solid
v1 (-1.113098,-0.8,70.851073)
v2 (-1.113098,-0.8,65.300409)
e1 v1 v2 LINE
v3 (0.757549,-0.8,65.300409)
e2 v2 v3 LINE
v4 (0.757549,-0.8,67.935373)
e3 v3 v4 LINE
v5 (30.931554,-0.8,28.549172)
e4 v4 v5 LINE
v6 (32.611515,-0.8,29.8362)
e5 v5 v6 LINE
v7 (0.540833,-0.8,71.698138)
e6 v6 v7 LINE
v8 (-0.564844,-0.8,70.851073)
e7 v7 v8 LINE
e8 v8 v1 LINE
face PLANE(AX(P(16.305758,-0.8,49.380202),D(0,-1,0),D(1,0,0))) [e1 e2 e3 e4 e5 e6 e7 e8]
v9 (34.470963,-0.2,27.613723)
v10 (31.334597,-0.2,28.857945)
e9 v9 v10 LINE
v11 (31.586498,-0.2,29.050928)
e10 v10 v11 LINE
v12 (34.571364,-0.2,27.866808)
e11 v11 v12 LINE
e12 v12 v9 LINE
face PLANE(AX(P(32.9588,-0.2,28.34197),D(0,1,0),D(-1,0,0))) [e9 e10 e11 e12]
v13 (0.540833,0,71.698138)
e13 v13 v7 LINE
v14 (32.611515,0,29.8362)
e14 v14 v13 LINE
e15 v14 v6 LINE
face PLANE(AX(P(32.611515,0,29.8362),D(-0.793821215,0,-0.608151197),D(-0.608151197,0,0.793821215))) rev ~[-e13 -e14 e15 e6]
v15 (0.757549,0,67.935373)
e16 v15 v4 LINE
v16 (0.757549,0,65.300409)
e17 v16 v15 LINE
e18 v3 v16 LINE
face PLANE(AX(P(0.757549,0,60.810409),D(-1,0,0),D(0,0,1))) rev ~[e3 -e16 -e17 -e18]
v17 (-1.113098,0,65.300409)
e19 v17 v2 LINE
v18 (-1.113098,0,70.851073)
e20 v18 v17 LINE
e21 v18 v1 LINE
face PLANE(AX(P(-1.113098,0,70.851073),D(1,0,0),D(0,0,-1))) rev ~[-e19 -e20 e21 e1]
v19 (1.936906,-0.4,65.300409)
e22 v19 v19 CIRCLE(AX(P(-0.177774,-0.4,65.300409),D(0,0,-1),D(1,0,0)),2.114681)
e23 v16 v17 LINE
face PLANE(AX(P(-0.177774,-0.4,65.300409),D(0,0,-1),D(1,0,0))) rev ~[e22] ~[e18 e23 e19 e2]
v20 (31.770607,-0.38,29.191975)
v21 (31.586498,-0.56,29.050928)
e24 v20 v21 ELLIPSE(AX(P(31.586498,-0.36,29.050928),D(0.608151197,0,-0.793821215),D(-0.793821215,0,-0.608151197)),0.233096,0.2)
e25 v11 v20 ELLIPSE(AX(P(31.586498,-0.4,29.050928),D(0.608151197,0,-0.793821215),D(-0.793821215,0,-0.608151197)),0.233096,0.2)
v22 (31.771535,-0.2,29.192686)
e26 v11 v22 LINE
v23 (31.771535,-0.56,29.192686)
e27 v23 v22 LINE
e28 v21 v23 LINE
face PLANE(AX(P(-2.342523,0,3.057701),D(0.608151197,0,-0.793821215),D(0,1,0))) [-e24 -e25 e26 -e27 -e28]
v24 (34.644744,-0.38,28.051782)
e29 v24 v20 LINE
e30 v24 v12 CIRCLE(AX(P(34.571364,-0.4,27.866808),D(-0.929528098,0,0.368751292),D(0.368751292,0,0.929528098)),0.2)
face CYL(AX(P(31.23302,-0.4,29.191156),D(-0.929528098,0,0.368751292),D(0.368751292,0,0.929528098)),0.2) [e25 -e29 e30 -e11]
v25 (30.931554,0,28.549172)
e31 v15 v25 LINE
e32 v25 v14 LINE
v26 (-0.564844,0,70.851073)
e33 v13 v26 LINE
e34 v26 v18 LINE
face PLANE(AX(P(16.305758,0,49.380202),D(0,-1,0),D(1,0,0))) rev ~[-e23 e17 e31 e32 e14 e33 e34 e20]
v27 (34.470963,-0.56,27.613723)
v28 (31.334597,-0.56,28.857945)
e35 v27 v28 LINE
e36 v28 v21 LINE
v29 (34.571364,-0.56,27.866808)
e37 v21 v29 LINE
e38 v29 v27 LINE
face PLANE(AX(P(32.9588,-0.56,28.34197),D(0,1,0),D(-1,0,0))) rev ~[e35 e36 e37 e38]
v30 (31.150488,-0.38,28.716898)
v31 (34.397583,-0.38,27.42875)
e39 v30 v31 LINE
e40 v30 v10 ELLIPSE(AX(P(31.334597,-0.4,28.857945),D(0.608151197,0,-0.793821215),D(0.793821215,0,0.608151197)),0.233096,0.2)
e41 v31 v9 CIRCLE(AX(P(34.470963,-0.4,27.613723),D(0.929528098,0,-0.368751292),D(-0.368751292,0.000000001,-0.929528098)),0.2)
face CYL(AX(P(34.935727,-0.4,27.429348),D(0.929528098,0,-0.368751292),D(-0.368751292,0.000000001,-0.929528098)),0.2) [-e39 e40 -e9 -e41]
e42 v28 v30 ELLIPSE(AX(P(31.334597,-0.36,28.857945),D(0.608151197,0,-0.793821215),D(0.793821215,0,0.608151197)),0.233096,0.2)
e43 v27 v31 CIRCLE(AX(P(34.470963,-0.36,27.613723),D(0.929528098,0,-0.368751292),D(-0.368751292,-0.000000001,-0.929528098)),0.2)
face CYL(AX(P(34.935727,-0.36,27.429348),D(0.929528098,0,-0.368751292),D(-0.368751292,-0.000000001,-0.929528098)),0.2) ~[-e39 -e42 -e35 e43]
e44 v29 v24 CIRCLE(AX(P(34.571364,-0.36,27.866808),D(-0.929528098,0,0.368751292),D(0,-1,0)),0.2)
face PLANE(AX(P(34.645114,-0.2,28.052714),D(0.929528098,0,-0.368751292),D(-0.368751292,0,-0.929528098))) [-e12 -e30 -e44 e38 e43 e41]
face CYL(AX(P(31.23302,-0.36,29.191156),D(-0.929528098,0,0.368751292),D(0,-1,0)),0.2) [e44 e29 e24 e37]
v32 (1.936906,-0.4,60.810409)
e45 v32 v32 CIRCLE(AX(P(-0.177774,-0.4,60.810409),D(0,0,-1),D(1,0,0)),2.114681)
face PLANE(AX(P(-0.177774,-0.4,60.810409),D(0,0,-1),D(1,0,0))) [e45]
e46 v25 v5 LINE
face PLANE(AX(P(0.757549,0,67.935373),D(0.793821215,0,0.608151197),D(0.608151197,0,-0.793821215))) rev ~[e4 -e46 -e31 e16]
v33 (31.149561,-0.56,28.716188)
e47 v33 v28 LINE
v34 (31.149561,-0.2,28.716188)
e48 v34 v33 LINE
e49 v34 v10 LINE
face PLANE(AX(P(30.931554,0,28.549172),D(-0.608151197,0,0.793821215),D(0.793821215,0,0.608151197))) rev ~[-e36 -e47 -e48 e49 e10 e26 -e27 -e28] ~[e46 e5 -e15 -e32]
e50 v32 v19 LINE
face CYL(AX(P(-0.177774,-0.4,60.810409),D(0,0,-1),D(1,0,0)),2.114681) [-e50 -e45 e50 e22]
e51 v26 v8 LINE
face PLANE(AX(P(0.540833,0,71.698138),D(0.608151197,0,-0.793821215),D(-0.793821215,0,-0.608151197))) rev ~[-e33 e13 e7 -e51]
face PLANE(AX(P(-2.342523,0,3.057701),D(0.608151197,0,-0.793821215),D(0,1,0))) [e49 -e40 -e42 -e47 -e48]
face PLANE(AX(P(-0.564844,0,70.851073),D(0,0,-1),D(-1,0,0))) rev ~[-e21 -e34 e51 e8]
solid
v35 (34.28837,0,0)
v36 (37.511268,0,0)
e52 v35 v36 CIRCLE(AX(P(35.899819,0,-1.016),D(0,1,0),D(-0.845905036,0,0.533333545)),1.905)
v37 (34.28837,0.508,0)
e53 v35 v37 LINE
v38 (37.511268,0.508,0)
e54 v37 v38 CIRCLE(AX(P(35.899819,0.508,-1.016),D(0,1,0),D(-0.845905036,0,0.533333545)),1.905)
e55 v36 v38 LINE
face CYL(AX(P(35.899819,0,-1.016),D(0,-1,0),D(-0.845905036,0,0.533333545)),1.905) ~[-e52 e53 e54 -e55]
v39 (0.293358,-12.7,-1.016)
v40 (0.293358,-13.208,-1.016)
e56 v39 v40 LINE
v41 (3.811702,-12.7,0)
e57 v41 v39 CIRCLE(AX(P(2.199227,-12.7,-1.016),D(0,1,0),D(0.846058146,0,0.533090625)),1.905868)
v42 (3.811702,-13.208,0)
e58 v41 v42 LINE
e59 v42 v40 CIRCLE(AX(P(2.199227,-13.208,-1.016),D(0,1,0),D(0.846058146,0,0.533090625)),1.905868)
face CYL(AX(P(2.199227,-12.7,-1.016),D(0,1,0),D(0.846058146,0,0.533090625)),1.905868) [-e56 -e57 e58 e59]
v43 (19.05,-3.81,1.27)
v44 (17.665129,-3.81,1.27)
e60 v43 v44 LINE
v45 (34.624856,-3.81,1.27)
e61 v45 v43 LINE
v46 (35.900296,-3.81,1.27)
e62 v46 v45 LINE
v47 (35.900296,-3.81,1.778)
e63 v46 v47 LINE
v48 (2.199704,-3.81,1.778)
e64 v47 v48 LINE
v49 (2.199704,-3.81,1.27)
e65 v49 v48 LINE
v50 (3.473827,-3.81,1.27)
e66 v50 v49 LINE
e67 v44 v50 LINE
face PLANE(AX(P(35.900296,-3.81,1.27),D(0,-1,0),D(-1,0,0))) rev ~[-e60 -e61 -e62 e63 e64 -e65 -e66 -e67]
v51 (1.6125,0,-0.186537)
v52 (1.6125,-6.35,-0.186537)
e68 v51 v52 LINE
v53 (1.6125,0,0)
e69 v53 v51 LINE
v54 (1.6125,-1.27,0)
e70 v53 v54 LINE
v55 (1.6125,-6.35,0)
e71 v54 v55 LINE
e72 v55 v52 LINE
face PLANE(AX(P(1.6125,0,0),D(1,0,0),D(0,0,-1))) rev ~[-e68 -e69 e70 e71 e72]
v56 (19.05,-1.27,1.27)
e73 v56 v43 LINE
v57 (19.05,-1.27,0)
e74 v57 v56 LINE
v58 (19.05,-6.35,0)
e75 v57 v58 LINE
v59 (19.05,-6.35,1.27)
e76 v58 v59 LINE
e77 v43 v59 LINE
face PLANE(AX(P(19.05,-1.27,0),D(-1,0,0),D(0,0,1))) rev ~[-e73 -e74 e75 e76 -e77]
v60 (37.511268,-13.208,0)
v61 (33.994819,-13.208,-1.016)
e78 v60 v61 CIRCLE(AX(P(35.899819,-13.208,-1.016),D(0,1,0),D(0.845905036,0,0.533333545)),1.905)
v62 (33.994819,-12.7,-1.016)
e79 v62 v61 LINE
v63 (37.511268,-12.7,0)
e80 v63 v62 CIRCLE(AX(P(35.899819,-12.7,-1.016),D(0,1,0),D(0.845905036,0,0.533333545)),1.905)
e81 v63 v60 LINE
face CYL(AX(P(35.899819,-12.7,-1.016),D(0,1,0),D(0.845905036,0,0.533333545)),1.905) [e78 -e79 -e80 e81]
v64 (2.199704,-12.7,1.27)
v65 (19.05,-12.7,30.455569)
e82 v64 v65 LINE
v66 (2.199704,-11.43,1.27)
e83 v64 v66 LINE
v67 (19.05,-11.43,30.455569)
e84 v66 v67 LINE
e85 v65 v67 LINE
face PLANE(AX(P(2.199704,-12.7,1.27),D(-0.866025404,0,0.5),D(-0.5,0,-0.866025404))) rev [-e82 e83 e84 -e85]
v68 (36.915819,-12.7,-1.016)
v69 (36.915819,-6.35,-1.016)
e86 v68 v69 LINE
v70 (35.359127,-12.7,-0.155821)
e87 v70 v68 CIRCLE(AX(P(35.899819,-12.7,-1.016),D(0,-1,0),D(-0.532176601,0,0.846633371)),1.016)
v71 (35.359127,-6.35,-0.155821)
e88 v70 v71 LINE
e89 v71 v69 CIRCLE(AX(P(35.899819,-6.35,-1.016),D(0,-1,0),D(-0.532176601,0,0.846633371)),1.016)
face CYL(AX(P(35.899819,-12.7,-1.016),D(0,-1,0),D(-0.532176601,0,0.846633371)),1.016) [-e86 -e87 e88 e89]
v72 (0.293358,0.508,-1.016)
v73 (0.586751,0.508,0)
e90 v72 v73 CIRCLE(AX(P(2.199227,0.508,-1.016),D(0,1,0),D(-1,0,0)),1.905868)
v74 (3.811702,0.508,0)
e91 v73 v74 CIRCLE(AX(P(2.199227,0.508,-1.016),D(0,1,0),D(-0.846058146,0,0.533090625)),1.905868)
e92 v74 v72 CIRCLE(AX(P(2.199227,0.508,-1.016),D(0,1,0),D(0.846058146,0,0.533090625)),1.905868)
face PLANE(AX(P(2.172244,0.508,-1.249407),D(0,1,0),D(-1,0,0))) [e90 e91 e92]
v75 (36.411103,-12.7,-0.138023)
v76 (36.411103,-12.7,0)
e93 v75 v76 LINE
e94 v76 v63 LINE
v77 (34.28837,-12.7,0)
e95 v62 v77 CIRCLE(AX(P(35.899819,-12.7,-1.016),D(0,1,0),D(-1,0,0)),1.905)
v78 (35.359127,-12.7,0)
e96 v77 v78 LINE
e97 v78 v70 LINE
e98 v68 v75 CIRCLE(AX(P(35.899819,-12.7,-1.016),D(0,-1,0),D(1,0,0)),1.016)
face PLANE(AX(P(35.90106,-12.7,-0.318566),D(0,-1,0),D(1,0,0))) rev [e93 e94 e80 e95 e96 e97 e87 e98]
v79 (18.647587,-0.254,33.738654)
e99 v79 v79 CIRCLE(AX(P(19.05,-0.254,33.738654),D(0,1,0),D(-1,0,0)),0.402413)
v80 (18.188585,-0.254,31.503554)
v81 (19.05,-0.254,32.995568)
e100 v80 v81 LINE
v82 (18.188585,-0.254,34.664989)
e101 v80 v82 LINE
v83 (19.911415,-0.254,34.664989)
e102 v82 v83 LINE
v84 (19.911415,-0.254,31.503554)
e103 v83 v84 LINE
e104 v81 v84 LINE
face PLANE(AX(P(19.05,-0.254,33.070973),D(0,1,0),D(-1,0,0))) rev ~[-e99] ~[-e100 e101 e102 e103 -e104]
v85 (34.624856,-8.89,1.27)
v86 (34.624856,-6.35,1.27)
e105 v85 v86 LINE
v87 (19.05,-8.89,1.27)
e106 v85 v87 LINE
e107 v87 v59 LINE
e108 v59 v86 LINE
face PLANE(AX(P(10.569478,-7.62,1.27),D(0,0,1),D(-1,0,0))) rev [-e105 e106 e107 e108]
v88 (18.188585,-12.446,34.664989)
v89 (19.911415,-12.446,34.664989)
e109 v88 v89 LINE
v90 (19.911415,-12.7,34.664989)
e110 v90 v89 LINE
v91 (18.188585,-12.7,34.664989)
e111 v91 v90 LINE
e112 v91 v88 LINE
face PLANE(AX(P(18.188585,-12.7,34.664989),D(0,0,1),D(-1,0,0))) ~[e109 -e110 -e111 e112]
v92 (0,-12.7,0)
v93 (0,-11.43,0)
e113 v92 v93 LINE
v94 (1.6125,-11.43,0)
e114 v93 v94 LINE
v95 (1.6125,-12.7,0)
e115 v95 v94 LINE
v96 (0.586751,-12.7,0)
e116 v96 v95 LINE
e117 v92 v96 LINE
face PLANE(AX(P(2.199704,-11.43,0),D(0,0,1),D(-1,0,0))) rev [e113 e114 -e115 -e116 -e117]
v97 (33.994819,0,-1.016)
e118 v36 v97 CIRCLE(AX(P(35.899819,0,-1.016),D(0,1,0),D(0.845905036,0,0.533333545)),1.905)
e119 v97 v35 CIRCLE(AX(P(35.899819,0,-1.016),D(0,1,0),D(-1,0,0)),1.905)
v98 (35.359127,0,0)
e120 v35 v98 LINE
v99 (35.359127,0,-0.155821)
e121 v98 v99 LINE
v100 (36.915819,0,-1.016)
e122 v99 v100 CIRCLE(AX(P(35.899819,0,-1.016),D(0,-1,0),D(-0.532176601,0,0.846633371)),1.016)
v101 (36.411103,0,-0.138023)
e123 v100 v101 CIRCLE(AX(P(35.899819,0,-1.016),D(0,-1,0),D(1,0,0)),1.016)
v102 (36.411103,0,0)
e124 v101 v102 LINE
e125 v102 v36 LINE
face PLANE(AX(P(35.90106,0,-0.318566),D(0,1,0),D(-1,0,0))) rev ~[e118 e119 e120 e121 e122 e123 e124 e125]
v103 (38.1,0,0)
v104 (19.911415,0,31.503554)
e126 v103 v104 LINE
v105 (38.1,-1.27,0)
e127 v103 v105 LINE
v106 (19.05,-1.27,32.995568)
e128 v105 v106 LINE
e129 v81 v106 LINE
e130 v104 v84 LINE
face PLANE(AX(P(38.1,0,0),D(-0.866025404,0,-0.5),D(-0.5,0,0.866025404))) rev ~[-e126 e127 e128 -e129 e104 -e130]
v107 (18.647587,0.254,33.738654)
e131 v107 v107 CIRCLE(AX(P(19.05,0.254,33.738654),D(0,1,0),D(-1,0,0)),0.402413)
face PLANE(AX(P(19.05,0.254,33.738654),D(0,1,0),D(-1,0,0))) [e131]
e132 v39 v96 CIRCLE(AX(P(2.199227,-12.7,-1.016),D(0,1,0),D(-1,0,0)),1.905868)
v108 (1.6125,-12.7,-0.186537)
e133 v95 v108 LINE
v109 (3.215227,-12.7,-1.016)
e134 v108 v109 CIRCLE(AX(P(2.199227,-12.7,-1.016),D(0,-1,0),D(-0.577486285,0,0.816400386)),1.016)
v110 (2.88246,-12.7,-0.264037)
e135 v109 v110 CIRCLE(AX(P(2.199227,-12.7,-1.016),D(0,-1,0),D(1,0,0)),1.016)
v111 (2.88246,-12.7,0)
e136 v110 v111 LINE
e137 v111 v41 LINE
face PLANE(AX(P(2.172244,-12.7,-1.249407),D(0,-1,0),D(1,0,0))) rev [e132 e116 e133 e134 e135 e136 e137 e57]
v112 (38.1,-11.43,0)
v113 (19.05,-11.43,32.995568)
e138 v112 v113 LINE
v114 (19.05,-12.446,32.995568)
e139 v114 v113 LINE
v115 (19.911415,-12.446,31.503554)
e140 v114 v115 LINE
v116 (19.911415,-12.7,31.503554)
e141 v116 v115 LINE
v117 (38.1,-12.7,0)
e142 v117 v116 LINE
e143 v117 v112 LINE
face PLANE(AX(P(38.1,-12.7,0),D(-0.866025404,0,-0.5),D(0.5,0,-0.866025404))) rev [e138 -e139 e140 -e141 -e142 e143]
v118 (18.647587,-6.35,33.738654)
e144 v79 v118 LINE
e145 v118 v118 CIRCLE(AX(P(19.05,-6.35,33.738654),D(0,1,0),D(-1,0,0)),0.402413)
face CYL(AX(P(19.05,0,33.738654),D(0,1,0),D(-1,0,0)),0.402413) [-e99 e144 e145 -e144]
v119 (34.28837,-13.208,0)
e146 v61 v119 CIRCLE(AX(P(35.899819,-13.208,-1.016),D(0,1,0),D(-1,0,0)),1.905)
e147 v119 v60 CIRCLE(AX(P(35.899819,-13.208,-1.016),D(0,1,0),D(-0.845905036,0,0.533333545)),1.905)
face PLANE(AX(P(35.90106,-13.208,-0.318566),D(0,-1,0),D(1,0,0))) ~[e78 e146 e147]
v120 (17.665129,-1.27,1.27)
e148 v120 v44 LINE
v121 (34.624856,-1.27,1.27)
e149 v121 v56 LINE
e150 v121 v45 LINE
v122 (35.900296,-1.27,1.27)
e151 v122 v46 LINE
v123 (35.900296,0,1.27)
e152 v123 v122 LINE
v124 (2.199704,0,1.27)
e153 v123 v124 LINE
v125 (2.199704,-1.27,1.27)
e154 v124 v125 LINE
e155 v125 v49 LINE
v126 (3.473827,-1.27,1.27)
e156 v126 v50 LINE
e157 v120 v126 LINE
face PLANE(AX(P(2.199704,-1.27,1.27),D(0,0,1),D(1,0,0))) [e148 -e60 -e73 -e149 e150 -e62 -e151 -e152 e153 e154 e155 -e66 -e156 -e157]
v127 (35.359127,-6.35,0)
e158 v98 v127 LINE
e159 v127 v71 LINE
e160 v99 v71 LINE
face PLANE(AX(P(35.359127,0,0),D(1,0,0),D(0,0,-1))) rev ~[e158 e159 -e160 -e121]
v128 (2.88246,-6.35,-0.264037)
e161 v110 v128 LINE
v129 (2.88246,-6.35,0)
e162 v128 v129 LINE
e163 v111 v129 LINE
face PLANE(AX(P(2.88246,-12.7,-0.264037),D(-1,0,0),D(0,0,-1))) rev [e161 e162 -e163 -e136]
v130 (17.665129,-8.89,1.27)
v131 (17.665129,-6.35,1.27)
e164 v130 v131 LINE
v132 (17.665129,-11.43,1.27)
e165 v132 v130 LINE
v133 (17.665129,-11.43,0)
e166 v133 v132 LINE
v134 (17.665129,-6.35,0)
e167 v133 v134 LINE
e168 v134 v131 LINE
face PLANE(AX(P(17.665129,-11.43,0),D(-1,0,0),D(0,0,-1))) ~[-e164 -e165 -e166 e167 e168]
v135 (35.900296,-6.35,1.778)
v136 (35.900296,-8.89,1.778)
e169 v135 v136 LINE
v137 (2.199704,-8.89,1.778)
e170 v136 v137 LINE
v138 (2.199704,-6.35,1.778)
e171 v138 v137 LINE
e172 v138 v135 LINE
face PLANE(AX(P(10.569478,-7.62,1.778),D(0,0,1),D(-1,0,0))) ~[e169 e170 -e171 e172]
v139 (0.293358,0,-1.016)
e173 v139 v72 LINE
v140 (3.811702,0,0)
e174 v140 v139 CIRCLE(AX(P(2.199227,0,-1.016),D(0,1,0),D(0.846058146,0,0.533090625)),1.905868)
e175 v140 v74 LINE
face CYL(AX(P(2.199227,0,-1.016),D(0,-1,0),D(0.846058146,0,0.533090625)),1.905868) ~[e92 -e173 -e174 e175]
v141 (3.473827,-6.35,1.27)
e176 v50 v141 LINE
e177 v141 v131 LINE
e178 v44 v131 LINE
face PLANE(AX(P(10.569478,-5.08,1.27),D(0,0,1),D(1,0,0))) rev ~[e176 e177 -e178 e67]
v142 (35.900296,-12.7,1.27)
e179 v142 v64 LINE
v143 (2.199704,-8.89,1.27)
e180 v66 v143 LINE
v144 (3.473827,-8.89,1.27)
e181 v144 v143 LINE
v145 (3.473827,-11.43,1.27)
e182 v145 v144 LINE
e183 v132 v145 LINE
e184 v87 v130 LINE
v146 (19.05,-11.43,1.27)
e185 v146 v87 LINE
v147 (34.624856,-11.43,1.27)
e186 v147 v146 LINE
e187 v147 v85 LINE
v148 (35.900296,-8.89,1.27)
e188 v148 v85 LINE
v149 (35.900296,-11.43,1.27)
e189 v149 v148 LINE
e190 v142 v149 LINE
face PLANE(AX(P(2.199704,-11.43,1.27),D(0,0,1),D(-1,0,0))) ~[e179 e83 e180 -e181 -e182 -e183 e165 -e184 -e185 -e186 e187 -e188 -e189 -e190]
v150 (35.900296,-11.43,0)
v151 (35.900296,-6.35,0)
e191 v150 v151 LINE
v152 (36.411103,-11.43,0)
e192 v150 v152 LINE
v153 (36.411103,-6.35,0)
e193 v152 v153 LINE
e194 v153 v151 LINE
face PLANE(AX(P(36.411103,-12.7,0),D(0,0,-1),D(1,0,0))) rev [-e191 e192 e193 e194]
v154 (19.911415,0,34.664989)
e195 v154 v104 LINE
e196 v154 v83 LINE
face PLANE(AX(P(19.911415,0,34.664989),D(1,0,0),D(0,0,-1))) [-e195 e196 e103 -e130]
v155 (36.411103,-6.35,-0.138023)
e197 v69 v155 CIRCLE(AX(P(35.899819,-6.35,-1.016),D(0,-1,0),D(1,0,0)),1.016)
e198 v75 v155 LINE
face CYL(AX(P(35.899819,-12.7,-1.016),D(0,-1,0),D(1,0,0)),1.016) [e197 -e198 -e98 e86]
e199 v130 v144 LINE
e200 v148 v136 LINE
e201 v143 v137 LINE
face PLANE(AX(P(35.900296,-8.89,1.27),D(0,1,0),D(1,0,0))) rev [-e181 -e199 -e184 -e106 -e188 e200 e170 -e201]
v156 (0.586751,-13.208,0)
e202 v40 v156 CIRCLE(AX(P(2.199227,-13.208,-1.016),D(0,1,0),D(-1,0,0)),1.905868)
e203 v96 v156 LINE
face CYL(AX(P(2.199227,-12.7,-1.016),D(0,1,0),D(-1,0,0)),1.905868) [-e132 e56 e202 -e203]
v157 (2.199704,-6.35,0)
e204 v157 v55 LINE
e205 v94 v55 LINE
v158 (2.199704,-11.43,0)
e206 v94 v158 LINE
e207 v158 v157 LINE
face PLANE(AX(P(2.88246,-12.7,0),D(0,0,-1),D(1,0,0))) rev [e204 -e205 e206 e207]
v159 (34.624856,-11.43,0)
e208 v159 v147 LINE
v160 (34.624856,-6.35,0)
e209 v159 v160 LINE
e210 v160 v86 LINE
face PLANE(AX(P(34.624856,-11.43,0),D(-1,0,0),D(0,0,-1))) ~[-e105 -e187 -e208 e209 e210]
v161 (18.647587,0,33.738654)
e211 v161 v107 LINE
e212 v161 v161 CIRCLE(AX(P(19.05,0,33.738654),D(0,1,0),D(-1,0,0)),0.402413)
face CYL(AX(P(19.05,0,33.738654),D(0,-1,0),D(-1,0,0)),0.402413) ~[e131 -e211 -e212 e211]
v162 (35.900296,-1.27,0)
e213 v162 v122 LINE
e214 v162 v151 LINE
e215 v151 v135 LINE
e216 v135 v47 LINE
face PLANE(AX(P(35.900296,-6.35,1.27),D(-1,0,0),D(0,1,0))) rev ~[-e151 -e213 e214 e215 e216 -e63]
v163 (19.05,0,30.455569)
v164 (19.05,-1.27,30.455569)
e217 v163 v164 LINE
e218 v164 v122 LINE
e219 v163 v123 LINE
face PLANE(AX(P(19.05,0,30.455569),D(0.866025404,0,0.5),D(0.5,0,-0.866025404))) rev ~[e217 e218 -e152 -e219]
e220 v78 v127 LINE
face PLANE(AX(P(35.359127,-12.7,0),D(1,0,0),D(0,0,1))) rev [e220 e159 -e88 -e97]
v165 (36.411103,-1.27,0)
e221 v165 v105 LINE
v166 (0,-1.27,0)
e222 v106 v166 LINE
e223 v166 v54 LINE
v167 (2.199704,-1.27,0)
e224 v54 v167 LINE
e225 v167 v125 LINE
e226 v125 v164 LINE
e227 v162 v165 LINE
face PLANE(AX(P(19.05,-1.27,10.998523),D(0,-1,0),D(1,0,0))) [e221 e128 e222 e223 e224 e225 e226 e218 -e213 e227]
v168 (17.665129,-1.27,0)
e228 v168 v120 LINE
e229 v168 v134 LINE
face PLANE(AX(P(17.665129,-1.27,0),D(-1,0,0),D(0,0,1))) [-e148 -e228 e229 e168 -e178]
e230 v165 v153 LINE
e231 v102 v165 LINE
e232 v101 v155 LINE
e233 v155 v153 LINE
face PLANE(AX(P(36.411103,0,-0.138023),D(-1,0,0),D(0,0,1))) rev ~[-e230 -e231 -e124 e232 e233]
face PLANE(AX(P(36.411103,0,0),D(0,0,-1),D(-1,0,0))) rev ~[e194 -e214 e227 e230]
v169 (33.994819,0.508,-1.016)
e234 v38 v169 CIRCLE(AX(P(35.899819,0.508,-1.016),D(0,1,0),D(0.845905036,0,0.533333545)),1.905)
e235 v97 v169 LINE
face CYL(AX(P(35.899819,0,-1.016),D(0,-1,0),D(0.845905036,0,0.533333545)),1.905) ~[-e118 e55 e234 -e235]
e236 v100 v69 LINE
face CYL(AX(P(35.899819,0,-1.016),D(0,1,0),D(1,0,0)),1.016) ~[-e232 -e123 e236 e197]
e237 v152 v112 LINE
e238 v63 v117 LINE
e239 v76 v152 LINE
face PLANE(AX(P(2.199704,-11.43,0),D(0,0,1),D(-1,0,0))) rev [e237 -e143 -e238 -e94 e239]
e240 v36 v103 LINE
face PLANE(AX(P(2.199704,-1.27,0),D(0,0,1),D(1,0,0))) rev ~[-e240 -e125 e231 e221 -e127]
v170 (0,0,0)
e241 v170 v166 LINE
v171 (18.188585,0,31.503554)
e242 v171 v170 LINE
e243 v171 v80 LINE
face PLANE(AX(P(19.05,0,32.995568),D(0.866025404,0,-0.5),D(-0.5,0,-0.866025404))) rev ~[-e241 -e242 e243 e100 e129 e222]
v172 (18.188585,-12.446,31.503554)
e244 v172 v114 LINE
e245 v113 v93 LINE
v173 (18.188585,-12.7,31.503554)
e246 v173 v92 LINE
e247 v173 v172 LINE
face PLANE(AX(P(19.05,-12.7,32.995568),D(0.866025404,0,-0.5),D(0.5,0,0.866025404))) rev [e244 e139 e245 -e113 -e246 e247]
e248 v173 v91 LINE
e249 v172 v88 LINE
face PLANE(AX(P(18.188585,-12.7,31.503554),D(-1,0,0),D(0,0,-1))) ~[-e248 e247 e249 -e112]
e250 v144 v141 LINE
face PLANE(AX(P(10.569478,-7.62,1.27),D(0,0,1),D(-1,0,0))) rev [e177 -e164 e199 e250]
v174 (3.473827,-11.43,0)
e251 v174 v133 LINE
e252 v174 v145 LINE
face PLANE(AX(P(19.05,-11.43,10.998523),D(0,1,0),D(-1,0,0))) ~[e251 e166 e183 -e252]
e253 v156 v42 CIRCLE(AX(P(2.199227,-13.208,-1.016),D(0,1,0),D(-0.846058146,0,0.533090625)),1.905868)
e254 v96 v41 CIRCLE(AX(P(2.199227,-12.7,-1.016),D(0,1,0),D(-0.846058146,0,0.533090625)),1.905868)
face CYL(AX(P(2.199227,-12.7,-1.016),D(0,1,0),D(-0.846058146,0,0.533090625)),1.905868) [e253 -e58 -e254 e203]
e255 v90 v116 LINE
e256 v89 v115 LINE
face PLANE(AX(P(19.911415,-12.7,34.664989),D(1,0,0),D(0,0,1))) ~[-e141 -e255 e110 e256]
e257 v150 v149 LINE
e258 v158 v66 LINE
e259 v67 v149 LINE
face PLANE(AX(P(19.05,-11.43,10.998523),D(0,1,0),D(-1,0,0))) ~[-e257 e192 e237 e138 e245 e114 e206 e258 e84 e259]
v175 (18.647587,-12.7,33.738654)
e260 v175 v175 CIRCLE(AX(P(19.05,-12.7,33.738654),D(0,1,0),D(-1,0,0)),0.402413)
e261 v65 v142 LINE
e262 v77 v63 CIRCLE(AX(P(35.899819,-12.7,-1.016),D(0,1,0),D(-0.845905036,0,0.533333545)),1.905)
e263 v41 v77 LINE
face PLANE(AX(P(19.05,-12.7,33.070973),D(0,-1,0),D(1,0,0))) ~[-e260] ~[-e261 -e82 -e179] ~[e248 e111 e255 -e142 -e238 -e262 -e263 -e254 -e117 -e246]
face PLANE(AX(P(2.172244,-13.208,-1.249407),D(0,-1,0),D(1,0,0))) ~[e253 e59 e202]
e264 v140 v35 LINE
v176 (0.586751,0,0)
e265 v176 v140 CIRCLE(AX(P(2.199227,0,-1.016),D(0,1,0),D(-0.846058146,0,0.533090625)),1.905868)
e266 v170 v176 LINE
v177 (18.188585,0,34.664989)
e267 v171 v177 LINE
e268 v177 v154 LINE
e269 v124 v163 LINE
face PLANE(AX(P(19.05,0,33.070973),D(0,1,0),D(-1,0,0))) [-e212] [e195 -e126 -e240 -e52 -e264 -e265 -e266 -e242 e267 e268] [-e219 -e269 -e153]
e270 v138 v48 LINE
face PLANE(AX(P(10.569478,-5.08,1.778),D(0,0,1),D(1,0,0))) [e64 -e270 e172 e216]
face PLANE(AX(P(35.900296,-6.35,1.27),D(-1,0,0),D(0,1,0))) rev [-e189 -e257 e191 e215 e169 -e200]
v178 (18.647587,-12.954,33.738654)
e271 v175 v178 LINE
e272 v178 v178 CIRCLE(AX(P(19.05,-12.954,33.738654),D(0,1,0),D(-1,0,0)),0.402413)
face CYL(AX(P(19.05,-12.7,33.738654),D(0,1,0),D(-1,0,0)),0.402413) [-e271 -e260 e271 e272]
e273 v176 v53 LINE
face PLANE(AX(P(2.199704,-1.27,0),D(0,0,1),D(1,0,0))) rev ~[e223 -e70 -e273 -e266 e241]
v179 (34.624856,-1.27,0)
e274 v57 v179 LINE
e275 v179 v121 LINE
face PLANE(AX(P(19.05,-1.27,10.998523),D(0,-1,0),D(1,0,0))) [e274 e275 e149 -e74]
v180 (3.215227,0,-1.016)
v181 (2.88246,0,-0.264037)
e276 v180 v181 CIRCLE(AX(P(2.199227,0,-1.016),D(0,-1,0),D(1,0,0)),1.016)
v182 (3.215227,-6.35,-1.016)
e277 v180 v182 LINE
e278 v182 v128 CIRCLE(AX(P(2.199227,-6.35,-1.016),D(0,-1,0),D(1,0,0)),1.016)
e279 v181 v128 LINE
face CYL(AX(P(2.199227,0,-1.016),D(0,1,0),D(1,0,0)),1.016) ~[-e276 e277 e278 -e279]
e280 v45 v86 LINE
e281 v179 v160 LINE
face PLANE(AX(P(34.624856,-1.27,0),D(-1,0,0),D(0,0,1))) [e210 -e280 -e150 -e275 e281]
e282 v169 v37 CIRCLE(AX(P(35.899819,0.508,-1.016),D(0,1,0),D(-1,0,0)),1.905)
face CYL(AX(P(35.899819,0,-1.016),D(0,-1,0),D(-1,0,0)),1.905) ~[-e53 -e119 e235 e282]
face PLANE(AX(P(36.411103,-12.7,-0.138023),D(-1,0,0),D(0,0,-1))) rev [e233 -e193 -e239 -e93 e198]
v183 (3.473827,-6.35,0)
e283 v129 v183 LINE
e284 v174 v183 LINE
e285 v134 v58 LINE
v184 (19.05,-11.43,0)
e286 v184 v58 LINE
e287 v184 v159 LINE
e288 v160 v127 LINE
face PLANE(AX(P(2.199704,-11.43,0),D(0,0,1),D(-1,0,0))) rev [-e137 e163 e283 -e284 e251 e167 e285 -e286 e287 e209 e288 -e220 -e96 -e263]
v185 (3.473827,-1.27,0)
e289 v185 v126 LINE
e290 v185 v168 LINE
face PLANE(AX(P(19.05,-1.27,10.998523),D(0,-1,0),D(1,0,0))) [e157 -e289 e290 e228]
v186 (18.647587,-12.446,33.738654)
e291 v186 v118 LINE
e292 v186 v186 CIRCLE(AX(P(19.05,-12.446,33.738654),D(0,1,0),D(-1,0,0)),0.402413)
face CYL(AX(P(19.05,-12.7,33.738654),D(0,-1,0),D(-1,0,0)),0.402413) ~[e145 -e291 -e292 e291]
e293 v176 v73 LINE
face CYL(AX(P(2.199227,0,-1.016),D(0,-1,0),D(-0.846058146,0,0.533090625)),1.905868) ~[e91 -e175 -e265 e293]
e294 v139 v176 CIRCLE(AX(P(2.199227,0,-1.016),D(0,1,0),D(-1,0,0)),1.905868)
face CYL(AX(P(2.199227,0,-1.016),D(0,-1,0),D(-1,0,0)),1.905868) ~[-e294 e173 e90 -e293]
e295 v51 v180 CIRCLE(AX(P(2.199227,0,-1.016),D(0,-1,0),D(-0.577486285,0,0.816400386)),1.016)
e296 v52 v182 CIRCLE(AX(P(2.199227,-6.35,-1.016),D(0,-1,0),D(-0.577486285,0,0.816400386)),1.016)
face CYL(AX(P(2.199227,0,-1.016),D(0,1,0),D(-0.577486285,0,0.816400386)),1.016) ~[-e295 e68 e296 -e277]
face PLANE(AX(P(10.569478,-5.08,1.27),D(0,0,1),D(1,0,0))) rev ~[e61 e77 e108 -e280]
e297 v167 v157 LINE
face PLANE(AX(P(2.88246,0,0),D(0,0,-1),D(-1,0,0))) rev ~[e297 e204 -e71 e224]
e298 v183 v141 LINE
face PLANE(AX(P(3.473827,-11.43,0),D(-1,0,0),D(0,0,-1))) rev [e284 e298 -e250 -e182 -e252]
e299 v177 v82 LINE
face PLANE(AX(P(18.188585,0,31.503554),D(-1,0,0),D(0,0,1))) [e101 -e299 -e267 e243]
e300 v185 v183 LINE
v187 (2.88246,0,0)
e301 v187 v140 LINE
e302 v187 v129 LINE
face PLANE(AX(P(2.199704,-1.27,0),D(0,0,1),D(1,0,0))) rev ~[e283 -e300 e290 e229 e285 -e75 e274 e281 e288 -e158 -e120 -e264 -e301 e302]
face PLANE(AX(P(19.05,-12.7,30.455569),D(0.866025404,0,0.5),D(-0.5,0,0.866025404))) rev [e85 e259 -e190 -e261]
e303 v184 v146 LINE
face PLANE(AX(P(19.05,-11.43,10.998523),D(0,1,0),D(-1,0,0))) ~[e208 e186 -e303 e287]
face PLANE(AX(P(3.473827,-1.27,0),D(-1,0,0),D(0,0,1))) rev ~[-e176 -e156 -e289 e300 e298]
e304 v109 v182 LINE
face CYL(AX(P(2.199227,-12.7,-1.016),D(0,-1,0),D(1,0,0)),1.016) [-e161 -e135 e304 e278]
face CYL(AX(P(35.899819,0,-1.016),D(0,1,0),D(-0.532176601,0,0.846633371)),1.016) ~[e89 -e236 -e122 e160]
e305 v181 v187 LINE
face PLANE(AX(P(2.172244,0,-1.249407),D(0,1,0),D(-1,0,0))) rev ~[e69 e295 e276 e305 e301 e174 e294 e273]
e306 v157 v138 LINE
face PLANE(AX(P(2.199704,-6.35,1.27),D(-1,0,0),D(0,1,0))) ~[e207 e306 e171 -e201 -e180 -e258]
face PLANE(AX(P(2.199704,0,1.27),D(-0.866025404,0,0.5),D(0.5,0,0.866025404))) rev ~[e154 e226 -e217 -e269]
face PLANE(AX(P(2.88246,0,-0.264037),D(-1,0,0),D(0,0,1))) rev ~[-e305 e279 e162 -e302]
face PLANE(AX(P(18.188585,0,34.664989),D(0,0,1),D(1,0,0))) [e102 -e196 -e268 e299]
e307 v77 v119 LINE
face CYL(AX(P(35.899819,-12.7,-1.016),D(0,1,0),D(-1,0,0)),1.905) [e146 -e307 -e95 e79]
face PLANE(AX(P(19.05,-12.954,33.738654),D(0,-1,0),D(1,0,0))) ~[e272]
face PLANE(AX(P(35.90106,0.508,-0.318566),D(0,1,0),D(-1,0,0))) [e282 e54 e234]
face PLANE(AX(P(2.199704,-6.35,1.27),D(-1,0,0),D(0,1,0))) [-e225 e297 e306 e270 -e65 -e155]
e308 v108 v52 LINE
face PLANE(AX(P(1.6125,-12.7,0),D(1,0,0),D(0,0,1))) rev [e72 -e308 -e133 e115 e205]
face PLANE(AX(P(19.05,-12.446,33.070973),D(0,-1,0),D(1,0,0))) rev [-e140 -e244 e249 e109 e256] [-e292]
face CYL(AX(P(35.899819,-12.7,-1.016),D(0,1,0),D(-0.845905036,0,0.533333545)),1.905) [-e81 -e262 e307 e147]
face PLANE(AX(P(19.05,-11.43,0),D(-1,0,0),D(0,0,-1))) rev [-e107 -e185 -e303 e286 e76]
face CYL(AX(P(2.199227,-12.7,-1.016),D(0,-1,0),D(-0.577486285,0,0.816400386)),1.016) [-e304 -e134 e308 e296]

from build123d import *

# Parameters (mm, degrees)
F1_DEPTH       = 1.27
F2_W           = 1.2741235553
F2_H           = 1.2699995968
F2_W_2         = 1.3848708451
F2_W_3         = 1.2754402073
F3_DEPTH       = 5.08
F4_DEPTH       = 6.35
F6_DEPTH       = 0.508
F7_W           = 14.1913017724
F7_H           = 2.54
F7_W_2         = 1.2741235553
F7_W_3         = 1.3848708451
F7_W_4         = 15.5748559654
F7_W_5         = 1.2754402073
F8_DEPTH       = 0.508
F9_R           = 0.4024133142
F10_DEPTH      = 0.254
F11_DEPTH      = 0.254
F11_DEPTH_BACK = 6.35
F13_W          = 1.8706470204
F13_H          = 7.1249634751
F14_DEPTH      = 0.8
F15_R          = 2.114680679
F16_DEPTH      = 4.49
F18_START      = -0.2
F18_DEPTH      = 0.36
F19_T4_DEPTH   = 4.0914390002
F19_T9_DEPTH   = 4.0914390002
F19_T14_DEPTH  = 4.4938721404
F19_T19_DEPTH  = 4.4938721404


# Not quite as in the source:
# - a fillet or chamfer that OpenCascade refuses, or shapes differently, is made with other operations: its cross-section is extruded or revolved along the edge and cut away or added


with BuildPart() as f1:
    # F0 (on Front) → F1 (new body)
    with BuildSketch(Plane.XZ):
        Polygon((19.05, 32.9955678842), (0, 0), (1.6125002281, 0), (2.1992265269, 0), (2.8824598566, 0), (35.3591272308, 0), (35.8998188724, 0), (36.4111034397, 0), (38.1, 0), align=None)
        Polygon((35.9002961727, 1.2699995968), (2.1997038273, 1.2699995968), (19.05, 30.4555686905), align=None, mode=Mode.SUBTRACT)
    extrude(amount=F1_DEPTH)

    # F2 (on face) → F3 (join)
    with BuildSketch(Plane.XZ.offset(1.27)):
        with Locations((2.8367656049, 0.6349997984)):
            Rectangle(F2_W, F2_H)
        with Locations((18.3575645775, 0.6349997984)):
            Rectangle(F2_W_2, F2_H)
        with Locations((35.262576069, 0.6349997984)):
            Rectangle(F2_W_3, F2_H)
    extrude(amount=F3_DEPTH)

    # F0 (on Front) → F4 (join)
    with BuildSketch(Plane.XZ):
        with BuildLine():
            ThreePointArc((2.8824598566, -0.264036949), (2.5654652787, -0.0683053067), (2.1992265269, 0))
            ThreePointArc((2.1992265269, 0), (1.8913938178, -0.0477567136), (1.6125002281, -0.186537282))
            ThreePointArc((1.6125002281, -0.186537282), (1.7322454443, -1.9183226781), (3.2152269301, -1.0160004032))
            ThreePointArc((3.2152269301, -1.0160004032), (3.1283180611, -0.6048486789), (2.8824598566, -0.264036949))
        make_face()
        with BuildLine():
            ThreePointArc((36.4111034397, -0.138022664), (36.1646122657, -0.0351123983), (35.8998188724, 0))
            ThreePointArc((35.8998188724, 0), (35.6184705575, -0.0397320257), (35.3591272308, -0.1558205569))
            ThreePointArc((35.3591272308, -0.1558205569), (35.4084361837, -1.9052696945), (36.9158192755, -1.0160004032))
            ThreePointArc((36.9158192755, -1.0160004032), (36.7806486362, -0.5096450474), (36.4111034397, -0.138022664))
        make_face()
        with BuildLine():
            Line((2.1992265269, 0), (1.6125002281, 0))
            Line((1.6125002281, 0), (1.6125002281, -0.186537282))
            ThreePointArc((1.6125002281, -0.186537282), (1.8913938178, -0.0477567136), (2.1992265269, 0))
        make_face()
        with BuildLine():
            Line((36.4111034397, -0.138022664), (36.4111034397, 0))
            Line((36.4111034397, 0), (35.8998188724, 0))
            ThreePointArc((35.8998188724, 0), (36.1646122657, -0.0351123983), (36.4111034397, -0.138022664))
        make_face()
        with BuildLine():
            Line((35.8998188724, 0), (35.3591272308, 0))
            Line((35.3591272308, 0), (35.3591272308, -0.1558205569))
            ThreePointArc((35.3591272308, -0.1558205569), (35.6184705575, -0.0397320257), (35.8998188724, 0))
        make_face()
        with BuildLine():
            Line((2.8824598566, 0), (2.1992265269, 0))
            ThreePointArc((2.1992265269, 0), (2.5654652787, -0.0683053067), (2.8824598566, -0.264036949))
            Line((2.8824598566, -0.264036949), (2.8824598566, 0))
        make_face()
    extrude(amount=F4_DEPTH)

    # F5 (on face) → F6 (join)
    with BuildSketch(Plane(origin=(0, 0, 0), x_dir=(-1, 0, 0), z_dir=(0, 1, 0))):
        with BuildLine():
            Line((-35.3591272308, 0), (-34.2883697789, 0))
            ThreePointArc((-34.2883697789, 0), (-35.8998188724, 0.8889995968), (-37.5112679658, 0))
            Line((-37.5112679658, 0), (-36.4111034397, 0))
            Line((-36.4111034397, 0), (-36.4111034397, -0.138022664))
            ThreePointArc((-36.4111034397, -0.138022664), (-35.9170056479, -2.0318554293), (-35.3591272308, -0.1558205569))
            Line((-35.3591272308, -0.1558205569), (-35.3591272308, 0))
        make_face()
        with BuildLine():
            ThreePointArc((-37.5112679658, 0), (-36.4285978796, -2.8461418626), (-33.9948188724, -1.0160004032))
            ThreePointArc((-33.9948188724, -1.0160004032), (-34.0696774129, -0.4872213959), (-34.2883697789, 0))
            Line((-34.2883697789, 0), (-35.3591272308, 0))
            Line((-35.3591272308, 0), (-35.3591272308, -0.1558205569))
            ThreePointArc((-35.3591272308, -0.1558205569), (-35.9170056479, -2.0318554293), (-36.4111034397, -0.138022664))
            Line((-36.4111034397, -0.138022664), (-36.4111034397, 0))
            Line((-36.4111034397, 0), (-37.5112679658, 0))
        make_face()
        with BuildLine():
            Line((-2.8824598566, 0), (-3.8117017372, 0))
            ThreePointArc((-3.8117017372, 0), (-2.7279836056, -2.8470517609), (-0.293358451, -1.0160004032))
            ThreePointArc((-0.293358451, -1.0160004032), (-0.3681751692, -0.4872433245), (-0.5867513167, 0))
            Line((-0.5867513167, 0), (-1.6125002281, 0))
            Line((-1.6125002281, 0), (-1.6125002281, -0.186537282))
            ThreePointArc((-1.6125002281, -0.186537282), (-2.1373399263, -2.030114237), (-2.8824598566, -0.264036949))
            Line((-2.8824598566, -0.264036949), (-2.8824598566, 0))
        make_face()
        with BuildLine():
            ThreePointArc((-0.5867513167, 0), (-2.1992265269, 0.8898676727), (-3.8117017372, 0))
            Line((-3.8117017372, 0), (-2.8824598566, 0))
            Line((-2.8824598566, 0), (-2.8824598566, -0.264036949))
            ThreePointArc((-2.8824598566, -0.264036949), (-2.1373399263, -2.030114237), (-1.6125002281, -0.186537282))
            Line((-1.6125002281, -0.186537282), (-1.6125002281, 0))
            Line((-1.6125002281, 0), (-0.5867513167, 0))
        make_face()
    extrude(amount=F6_DEPTH)

    # F7 (on face) → F8 (join)
    with BuildSketch(Plane.XY.offset(1.2699995968)):
        with Locations((10.5694782687, -5.08)):
            Rectangle(F7_W, F7_H)
        with Locations((2.8367656049, -5.08)):
            Rectangle(F7_W_2, F7_H)
        with Locations((18.3575645775, -5.08)):
            Rectangle(F7_W_3, F7_H)
        with Locations((26.8374279827, -5.08)):
            Rectangle(F7_W_4, F7_H)
        with Locations((35.262576069, -5.08)):
            Rectangle(F7_W_5, F7_H)
    extrude(amount=F8_DEPTH)

    # F9 (on face) → F10 (join)
    with BuildSketch(Plane(origin=(0, 0, 0), x_dir=(-1, 0, 0), z_dir=(0, 1, 0))):
        Polygon((-19.9114145483, 34.6649885178), (-19.9114145483, 31.5035541202), (-19.05, 32.9955678842), (-18.1885854517, 31.5035541202), (-18.1885854517, 34.6649885178), align=None)
        with Locations((-19.05, 33.7386541069)):
            Circle(F9_R, mode=Mode.SUBTRACT)
        Polygon((-19.05, 32.9955678842), (-19.9114145483, 31.5035541202), (-18.1885854517, 31.5035541202), align=None)
    extrude(amount=-F10_DEPTH)

    # F9 (on face) → F11 (join, two sides)
    with BuildSketch(Plane(origin=(0, 0, 0), x_dir=(-1, 0, 0), z_dir=(0, 1, 0))) as f11_sk:
        with Locations((-19.05, 33.7386541069)):
            Circle(F9_R)
    extrude(amount=F11_DEPTH)
    extrude(f11_sk.sketch, amount=-F11_DEPTH_BACK)

    # F12: F1 across face


with BuildPart() as f1_1:
    add(f1.part)
    add(f1.part.mirror(Plane(origin=(18.9844198468, -6.35, 0.7885271629), x_dir=(1, 0, 0), z_dir=(0, -1, 0))))


with BuildPart() as f14:
    # F13 (on Front) → F14 (new body)
    with BuildSketch(Plane.XZ):
        Polygon((32.6115151858, 29.8361999529), (1.6799610114, 70.211231729), (0, 68.9242035151), (0.7575490221, 67.9353729614), (30.9315541743, 28.5491717389), align=None)
        Polygon((0, 68.9242035151), (1.6799610114, 70.211231729), (0.5408330401, 71.6981381993), (-0.5648436262, 70.851072669), (-1.1130979983, 70.4310517039), (-1.1130979983, 70.3771329992), align=None)
        Polygon((0.7575490221, 67.9353729614), (0, 68.9242035151), (-1.1130979983, 70.3771329992), (-1.1130979983, 67.9353729614), align=None)
        with Locations((-0.1777744881, 64.3728912239)):
            Rectangle(F13_W, F13_H)
        Polygon((-1.1130979983, 70.4310517039), (-0.5648436262, 70.851072669), (-1.1130979983, 70.851072669), align=None)
    extrude(amount=F14_DEPTH)

    # F15 (on face) → F16 (join)
    with BuildSketch(Plane(origin=(0, 0, 60.8104094863), x_dir=(1, 0, 0), z_dir=(0, 0, -1))):
        with Locations((-0.1777744881, 0.4)):
            Circle(F15_R)
        Polygon((0.7575490221, 0), (-0.1777744881, 0), (-1.1130979983, 0), (-1.1130979983, 0.8), (-0.1777744881, 0.8), (0.7575490221, 0.8), align=None, mode=Mode.SUBTRACT)
    extrude(amount=-F16_DEPTH)

    # F17 (on face) → F18 (join)
    with BuildSketch(Plane(origin=(0, 0, 0), x_dir=(-1, 0, 0), z_dir=(0, 1, 0)).offset(F18_START)):
        Polygon((-31.1495605422, 28.7161877258), (-31.77153468, 29.1926858459), (-34.645114094, 28.052713722), (-34.3972128675, 27.4278178617), align=None)
    extrude(amount=-F18_DEPTH)

    # F19: fillet of radius 0.2 on 4 edges, made by hand


with BuildPart() as f19_tool2:
    # F19_s3 → F19_t4 (new body)
    with BuildSketch(Plane(origin=(16.9803344824, 0, -6.7362356057), x_dir=(0, 1, 0), z_dir=(0.929528098, 0, -0.3687512915))):
        with BuildLine():
            ThreePointArc((-0.4, 38.8512161966), (-0.2585786438, 38.7926375529), (-0.2, 38.6512161966))
            Line((-0.2, 38.6512161966), (-0.2, 38.8512161966))
            Line((-0.2, 38.8512161966), (-0.4, 38.8512161966))
        make_face()
    extrude(amount=F19_T4_DEPTH)

    split(bisect_by=Plane(origin=(-2.3425232995, 0, 3.0577012755), x_dir=(0, 1, 0), z_dir=(0.6081511973, 0, -0.7938212149)), keep=Keep.TOP)


with BuildPart() as f14_1:
    add(f14.part)

    # F19_t1: cut F19_tool2
    add(f19_tool2.part, mode=Mode.SUBTRACT)


with BuildPart() as f19_tool7:
    # F19_s8 → F19_t9 (new body)
    with BuildSketch(Plane(origin=(16.9803344824, 0, -6.7362356057), x_dir=(0, 1, 0), z_dir=(0.929528098, 0, -0.3687512915))):
        with BuildLine():
            ThreePointArc((-0.56, 38.6512161966), (-0.5014213562, 38.7926375529), (-0.36, 38.8512161966))
            Line((-0.36, 38.8512161966), (-0.56, 38.8512161966))
            Line((-0.56, 38.8512161966), (-0.56, 38.6512161966))
        make_face()
    extrude(amount=F19_T9_DEPTH)

    split(bisect_by=Plane(origin=(-2.3425232995, 0, 3.0577012755), x_dir=(0, 1, 0), z_dir=(0.6081511973, 0, -0.7938212149)), keep=Keep.TOP)


with BuildPart() as f14_2:
    add(f14_1.part)

    # F19_t6: cut F19_tool7
    add(f19_tool7.part, mode=Mode.SUBTRACT)


with BuildPart() as f19_tool12:
    # F19_s13 → F19_t14 (new body)
    with BuildSketch(Plane(origin=(20.7834419944, 0, -8.244959021), x_dir=(0, 1, 0), z_dir=(-0.929528098, 0, 0.3687512915))):
        with BuildLine():
            ThreePointArc((-0.4, -38.1789440387), (-0.2585786438, -38.2375226825), (-0.2, -38.3789440387))
            Line((-0.2, -38.3789440387), (-0.2, -38.1789440387))
            Line((-0.2, -38.1789440387), (-0.4, -38.1789440387))
        make_face()
    extrude(amount=F19_T14_DEPTH)

    split(bisect_by=Plane(origin=(-2.3425232995, 0, 3.0577012755), x_dir=(0, 1, 0), z_dir=(0.6081511973, 0, -0.7938212149)), keep=Keep.TOP)


with BuildPart() as f14_3:
    add(f14_2.part)

    # F19_t11: cut F19_tool12
    add(f19_tool12.part, mode=Mode.SUBTRACT)


with BuildPart() as f19_tool17:
    # F19_s18 → F19_t19 (new body)
    with BuildSketch(Plane(origin=(20.7834419944, 0, -8.244959021), x_dir=(0, 1, 0), z_dir=(-0.929528098, 0, 0.3687512915))):
        with BuildLine():
            ThreePointArc((-0.36, -38.1789440387), (-0.5014213562, -38.2375226825), (-0.56, -38.3789440387))
            Line((-0.56, -38.3789440387), (-0.56, -38.1789440387))
            Line((-0.56, -38.1789440387), (-0.36, -38.1789440387))
        make_face()
    extrude(amount=F19_T19_DEPTH)

    split(bisect_by=Plane(origin=(-2.3425232995, 0, 3.0577012755), x_dir=(0, 1, 0), z_dir=(0.6081511973, 0, -0.7938212149)), keep=Keep.TOP)


with BuildPart() as f14_4:
    add(f14_3.part)

    # F19_t16: cut F19_tool17
    add(f19_tool17.part, mode=Mode.SUBTRACT)


solid = Compound([f1_1.part, f14_4.part])
